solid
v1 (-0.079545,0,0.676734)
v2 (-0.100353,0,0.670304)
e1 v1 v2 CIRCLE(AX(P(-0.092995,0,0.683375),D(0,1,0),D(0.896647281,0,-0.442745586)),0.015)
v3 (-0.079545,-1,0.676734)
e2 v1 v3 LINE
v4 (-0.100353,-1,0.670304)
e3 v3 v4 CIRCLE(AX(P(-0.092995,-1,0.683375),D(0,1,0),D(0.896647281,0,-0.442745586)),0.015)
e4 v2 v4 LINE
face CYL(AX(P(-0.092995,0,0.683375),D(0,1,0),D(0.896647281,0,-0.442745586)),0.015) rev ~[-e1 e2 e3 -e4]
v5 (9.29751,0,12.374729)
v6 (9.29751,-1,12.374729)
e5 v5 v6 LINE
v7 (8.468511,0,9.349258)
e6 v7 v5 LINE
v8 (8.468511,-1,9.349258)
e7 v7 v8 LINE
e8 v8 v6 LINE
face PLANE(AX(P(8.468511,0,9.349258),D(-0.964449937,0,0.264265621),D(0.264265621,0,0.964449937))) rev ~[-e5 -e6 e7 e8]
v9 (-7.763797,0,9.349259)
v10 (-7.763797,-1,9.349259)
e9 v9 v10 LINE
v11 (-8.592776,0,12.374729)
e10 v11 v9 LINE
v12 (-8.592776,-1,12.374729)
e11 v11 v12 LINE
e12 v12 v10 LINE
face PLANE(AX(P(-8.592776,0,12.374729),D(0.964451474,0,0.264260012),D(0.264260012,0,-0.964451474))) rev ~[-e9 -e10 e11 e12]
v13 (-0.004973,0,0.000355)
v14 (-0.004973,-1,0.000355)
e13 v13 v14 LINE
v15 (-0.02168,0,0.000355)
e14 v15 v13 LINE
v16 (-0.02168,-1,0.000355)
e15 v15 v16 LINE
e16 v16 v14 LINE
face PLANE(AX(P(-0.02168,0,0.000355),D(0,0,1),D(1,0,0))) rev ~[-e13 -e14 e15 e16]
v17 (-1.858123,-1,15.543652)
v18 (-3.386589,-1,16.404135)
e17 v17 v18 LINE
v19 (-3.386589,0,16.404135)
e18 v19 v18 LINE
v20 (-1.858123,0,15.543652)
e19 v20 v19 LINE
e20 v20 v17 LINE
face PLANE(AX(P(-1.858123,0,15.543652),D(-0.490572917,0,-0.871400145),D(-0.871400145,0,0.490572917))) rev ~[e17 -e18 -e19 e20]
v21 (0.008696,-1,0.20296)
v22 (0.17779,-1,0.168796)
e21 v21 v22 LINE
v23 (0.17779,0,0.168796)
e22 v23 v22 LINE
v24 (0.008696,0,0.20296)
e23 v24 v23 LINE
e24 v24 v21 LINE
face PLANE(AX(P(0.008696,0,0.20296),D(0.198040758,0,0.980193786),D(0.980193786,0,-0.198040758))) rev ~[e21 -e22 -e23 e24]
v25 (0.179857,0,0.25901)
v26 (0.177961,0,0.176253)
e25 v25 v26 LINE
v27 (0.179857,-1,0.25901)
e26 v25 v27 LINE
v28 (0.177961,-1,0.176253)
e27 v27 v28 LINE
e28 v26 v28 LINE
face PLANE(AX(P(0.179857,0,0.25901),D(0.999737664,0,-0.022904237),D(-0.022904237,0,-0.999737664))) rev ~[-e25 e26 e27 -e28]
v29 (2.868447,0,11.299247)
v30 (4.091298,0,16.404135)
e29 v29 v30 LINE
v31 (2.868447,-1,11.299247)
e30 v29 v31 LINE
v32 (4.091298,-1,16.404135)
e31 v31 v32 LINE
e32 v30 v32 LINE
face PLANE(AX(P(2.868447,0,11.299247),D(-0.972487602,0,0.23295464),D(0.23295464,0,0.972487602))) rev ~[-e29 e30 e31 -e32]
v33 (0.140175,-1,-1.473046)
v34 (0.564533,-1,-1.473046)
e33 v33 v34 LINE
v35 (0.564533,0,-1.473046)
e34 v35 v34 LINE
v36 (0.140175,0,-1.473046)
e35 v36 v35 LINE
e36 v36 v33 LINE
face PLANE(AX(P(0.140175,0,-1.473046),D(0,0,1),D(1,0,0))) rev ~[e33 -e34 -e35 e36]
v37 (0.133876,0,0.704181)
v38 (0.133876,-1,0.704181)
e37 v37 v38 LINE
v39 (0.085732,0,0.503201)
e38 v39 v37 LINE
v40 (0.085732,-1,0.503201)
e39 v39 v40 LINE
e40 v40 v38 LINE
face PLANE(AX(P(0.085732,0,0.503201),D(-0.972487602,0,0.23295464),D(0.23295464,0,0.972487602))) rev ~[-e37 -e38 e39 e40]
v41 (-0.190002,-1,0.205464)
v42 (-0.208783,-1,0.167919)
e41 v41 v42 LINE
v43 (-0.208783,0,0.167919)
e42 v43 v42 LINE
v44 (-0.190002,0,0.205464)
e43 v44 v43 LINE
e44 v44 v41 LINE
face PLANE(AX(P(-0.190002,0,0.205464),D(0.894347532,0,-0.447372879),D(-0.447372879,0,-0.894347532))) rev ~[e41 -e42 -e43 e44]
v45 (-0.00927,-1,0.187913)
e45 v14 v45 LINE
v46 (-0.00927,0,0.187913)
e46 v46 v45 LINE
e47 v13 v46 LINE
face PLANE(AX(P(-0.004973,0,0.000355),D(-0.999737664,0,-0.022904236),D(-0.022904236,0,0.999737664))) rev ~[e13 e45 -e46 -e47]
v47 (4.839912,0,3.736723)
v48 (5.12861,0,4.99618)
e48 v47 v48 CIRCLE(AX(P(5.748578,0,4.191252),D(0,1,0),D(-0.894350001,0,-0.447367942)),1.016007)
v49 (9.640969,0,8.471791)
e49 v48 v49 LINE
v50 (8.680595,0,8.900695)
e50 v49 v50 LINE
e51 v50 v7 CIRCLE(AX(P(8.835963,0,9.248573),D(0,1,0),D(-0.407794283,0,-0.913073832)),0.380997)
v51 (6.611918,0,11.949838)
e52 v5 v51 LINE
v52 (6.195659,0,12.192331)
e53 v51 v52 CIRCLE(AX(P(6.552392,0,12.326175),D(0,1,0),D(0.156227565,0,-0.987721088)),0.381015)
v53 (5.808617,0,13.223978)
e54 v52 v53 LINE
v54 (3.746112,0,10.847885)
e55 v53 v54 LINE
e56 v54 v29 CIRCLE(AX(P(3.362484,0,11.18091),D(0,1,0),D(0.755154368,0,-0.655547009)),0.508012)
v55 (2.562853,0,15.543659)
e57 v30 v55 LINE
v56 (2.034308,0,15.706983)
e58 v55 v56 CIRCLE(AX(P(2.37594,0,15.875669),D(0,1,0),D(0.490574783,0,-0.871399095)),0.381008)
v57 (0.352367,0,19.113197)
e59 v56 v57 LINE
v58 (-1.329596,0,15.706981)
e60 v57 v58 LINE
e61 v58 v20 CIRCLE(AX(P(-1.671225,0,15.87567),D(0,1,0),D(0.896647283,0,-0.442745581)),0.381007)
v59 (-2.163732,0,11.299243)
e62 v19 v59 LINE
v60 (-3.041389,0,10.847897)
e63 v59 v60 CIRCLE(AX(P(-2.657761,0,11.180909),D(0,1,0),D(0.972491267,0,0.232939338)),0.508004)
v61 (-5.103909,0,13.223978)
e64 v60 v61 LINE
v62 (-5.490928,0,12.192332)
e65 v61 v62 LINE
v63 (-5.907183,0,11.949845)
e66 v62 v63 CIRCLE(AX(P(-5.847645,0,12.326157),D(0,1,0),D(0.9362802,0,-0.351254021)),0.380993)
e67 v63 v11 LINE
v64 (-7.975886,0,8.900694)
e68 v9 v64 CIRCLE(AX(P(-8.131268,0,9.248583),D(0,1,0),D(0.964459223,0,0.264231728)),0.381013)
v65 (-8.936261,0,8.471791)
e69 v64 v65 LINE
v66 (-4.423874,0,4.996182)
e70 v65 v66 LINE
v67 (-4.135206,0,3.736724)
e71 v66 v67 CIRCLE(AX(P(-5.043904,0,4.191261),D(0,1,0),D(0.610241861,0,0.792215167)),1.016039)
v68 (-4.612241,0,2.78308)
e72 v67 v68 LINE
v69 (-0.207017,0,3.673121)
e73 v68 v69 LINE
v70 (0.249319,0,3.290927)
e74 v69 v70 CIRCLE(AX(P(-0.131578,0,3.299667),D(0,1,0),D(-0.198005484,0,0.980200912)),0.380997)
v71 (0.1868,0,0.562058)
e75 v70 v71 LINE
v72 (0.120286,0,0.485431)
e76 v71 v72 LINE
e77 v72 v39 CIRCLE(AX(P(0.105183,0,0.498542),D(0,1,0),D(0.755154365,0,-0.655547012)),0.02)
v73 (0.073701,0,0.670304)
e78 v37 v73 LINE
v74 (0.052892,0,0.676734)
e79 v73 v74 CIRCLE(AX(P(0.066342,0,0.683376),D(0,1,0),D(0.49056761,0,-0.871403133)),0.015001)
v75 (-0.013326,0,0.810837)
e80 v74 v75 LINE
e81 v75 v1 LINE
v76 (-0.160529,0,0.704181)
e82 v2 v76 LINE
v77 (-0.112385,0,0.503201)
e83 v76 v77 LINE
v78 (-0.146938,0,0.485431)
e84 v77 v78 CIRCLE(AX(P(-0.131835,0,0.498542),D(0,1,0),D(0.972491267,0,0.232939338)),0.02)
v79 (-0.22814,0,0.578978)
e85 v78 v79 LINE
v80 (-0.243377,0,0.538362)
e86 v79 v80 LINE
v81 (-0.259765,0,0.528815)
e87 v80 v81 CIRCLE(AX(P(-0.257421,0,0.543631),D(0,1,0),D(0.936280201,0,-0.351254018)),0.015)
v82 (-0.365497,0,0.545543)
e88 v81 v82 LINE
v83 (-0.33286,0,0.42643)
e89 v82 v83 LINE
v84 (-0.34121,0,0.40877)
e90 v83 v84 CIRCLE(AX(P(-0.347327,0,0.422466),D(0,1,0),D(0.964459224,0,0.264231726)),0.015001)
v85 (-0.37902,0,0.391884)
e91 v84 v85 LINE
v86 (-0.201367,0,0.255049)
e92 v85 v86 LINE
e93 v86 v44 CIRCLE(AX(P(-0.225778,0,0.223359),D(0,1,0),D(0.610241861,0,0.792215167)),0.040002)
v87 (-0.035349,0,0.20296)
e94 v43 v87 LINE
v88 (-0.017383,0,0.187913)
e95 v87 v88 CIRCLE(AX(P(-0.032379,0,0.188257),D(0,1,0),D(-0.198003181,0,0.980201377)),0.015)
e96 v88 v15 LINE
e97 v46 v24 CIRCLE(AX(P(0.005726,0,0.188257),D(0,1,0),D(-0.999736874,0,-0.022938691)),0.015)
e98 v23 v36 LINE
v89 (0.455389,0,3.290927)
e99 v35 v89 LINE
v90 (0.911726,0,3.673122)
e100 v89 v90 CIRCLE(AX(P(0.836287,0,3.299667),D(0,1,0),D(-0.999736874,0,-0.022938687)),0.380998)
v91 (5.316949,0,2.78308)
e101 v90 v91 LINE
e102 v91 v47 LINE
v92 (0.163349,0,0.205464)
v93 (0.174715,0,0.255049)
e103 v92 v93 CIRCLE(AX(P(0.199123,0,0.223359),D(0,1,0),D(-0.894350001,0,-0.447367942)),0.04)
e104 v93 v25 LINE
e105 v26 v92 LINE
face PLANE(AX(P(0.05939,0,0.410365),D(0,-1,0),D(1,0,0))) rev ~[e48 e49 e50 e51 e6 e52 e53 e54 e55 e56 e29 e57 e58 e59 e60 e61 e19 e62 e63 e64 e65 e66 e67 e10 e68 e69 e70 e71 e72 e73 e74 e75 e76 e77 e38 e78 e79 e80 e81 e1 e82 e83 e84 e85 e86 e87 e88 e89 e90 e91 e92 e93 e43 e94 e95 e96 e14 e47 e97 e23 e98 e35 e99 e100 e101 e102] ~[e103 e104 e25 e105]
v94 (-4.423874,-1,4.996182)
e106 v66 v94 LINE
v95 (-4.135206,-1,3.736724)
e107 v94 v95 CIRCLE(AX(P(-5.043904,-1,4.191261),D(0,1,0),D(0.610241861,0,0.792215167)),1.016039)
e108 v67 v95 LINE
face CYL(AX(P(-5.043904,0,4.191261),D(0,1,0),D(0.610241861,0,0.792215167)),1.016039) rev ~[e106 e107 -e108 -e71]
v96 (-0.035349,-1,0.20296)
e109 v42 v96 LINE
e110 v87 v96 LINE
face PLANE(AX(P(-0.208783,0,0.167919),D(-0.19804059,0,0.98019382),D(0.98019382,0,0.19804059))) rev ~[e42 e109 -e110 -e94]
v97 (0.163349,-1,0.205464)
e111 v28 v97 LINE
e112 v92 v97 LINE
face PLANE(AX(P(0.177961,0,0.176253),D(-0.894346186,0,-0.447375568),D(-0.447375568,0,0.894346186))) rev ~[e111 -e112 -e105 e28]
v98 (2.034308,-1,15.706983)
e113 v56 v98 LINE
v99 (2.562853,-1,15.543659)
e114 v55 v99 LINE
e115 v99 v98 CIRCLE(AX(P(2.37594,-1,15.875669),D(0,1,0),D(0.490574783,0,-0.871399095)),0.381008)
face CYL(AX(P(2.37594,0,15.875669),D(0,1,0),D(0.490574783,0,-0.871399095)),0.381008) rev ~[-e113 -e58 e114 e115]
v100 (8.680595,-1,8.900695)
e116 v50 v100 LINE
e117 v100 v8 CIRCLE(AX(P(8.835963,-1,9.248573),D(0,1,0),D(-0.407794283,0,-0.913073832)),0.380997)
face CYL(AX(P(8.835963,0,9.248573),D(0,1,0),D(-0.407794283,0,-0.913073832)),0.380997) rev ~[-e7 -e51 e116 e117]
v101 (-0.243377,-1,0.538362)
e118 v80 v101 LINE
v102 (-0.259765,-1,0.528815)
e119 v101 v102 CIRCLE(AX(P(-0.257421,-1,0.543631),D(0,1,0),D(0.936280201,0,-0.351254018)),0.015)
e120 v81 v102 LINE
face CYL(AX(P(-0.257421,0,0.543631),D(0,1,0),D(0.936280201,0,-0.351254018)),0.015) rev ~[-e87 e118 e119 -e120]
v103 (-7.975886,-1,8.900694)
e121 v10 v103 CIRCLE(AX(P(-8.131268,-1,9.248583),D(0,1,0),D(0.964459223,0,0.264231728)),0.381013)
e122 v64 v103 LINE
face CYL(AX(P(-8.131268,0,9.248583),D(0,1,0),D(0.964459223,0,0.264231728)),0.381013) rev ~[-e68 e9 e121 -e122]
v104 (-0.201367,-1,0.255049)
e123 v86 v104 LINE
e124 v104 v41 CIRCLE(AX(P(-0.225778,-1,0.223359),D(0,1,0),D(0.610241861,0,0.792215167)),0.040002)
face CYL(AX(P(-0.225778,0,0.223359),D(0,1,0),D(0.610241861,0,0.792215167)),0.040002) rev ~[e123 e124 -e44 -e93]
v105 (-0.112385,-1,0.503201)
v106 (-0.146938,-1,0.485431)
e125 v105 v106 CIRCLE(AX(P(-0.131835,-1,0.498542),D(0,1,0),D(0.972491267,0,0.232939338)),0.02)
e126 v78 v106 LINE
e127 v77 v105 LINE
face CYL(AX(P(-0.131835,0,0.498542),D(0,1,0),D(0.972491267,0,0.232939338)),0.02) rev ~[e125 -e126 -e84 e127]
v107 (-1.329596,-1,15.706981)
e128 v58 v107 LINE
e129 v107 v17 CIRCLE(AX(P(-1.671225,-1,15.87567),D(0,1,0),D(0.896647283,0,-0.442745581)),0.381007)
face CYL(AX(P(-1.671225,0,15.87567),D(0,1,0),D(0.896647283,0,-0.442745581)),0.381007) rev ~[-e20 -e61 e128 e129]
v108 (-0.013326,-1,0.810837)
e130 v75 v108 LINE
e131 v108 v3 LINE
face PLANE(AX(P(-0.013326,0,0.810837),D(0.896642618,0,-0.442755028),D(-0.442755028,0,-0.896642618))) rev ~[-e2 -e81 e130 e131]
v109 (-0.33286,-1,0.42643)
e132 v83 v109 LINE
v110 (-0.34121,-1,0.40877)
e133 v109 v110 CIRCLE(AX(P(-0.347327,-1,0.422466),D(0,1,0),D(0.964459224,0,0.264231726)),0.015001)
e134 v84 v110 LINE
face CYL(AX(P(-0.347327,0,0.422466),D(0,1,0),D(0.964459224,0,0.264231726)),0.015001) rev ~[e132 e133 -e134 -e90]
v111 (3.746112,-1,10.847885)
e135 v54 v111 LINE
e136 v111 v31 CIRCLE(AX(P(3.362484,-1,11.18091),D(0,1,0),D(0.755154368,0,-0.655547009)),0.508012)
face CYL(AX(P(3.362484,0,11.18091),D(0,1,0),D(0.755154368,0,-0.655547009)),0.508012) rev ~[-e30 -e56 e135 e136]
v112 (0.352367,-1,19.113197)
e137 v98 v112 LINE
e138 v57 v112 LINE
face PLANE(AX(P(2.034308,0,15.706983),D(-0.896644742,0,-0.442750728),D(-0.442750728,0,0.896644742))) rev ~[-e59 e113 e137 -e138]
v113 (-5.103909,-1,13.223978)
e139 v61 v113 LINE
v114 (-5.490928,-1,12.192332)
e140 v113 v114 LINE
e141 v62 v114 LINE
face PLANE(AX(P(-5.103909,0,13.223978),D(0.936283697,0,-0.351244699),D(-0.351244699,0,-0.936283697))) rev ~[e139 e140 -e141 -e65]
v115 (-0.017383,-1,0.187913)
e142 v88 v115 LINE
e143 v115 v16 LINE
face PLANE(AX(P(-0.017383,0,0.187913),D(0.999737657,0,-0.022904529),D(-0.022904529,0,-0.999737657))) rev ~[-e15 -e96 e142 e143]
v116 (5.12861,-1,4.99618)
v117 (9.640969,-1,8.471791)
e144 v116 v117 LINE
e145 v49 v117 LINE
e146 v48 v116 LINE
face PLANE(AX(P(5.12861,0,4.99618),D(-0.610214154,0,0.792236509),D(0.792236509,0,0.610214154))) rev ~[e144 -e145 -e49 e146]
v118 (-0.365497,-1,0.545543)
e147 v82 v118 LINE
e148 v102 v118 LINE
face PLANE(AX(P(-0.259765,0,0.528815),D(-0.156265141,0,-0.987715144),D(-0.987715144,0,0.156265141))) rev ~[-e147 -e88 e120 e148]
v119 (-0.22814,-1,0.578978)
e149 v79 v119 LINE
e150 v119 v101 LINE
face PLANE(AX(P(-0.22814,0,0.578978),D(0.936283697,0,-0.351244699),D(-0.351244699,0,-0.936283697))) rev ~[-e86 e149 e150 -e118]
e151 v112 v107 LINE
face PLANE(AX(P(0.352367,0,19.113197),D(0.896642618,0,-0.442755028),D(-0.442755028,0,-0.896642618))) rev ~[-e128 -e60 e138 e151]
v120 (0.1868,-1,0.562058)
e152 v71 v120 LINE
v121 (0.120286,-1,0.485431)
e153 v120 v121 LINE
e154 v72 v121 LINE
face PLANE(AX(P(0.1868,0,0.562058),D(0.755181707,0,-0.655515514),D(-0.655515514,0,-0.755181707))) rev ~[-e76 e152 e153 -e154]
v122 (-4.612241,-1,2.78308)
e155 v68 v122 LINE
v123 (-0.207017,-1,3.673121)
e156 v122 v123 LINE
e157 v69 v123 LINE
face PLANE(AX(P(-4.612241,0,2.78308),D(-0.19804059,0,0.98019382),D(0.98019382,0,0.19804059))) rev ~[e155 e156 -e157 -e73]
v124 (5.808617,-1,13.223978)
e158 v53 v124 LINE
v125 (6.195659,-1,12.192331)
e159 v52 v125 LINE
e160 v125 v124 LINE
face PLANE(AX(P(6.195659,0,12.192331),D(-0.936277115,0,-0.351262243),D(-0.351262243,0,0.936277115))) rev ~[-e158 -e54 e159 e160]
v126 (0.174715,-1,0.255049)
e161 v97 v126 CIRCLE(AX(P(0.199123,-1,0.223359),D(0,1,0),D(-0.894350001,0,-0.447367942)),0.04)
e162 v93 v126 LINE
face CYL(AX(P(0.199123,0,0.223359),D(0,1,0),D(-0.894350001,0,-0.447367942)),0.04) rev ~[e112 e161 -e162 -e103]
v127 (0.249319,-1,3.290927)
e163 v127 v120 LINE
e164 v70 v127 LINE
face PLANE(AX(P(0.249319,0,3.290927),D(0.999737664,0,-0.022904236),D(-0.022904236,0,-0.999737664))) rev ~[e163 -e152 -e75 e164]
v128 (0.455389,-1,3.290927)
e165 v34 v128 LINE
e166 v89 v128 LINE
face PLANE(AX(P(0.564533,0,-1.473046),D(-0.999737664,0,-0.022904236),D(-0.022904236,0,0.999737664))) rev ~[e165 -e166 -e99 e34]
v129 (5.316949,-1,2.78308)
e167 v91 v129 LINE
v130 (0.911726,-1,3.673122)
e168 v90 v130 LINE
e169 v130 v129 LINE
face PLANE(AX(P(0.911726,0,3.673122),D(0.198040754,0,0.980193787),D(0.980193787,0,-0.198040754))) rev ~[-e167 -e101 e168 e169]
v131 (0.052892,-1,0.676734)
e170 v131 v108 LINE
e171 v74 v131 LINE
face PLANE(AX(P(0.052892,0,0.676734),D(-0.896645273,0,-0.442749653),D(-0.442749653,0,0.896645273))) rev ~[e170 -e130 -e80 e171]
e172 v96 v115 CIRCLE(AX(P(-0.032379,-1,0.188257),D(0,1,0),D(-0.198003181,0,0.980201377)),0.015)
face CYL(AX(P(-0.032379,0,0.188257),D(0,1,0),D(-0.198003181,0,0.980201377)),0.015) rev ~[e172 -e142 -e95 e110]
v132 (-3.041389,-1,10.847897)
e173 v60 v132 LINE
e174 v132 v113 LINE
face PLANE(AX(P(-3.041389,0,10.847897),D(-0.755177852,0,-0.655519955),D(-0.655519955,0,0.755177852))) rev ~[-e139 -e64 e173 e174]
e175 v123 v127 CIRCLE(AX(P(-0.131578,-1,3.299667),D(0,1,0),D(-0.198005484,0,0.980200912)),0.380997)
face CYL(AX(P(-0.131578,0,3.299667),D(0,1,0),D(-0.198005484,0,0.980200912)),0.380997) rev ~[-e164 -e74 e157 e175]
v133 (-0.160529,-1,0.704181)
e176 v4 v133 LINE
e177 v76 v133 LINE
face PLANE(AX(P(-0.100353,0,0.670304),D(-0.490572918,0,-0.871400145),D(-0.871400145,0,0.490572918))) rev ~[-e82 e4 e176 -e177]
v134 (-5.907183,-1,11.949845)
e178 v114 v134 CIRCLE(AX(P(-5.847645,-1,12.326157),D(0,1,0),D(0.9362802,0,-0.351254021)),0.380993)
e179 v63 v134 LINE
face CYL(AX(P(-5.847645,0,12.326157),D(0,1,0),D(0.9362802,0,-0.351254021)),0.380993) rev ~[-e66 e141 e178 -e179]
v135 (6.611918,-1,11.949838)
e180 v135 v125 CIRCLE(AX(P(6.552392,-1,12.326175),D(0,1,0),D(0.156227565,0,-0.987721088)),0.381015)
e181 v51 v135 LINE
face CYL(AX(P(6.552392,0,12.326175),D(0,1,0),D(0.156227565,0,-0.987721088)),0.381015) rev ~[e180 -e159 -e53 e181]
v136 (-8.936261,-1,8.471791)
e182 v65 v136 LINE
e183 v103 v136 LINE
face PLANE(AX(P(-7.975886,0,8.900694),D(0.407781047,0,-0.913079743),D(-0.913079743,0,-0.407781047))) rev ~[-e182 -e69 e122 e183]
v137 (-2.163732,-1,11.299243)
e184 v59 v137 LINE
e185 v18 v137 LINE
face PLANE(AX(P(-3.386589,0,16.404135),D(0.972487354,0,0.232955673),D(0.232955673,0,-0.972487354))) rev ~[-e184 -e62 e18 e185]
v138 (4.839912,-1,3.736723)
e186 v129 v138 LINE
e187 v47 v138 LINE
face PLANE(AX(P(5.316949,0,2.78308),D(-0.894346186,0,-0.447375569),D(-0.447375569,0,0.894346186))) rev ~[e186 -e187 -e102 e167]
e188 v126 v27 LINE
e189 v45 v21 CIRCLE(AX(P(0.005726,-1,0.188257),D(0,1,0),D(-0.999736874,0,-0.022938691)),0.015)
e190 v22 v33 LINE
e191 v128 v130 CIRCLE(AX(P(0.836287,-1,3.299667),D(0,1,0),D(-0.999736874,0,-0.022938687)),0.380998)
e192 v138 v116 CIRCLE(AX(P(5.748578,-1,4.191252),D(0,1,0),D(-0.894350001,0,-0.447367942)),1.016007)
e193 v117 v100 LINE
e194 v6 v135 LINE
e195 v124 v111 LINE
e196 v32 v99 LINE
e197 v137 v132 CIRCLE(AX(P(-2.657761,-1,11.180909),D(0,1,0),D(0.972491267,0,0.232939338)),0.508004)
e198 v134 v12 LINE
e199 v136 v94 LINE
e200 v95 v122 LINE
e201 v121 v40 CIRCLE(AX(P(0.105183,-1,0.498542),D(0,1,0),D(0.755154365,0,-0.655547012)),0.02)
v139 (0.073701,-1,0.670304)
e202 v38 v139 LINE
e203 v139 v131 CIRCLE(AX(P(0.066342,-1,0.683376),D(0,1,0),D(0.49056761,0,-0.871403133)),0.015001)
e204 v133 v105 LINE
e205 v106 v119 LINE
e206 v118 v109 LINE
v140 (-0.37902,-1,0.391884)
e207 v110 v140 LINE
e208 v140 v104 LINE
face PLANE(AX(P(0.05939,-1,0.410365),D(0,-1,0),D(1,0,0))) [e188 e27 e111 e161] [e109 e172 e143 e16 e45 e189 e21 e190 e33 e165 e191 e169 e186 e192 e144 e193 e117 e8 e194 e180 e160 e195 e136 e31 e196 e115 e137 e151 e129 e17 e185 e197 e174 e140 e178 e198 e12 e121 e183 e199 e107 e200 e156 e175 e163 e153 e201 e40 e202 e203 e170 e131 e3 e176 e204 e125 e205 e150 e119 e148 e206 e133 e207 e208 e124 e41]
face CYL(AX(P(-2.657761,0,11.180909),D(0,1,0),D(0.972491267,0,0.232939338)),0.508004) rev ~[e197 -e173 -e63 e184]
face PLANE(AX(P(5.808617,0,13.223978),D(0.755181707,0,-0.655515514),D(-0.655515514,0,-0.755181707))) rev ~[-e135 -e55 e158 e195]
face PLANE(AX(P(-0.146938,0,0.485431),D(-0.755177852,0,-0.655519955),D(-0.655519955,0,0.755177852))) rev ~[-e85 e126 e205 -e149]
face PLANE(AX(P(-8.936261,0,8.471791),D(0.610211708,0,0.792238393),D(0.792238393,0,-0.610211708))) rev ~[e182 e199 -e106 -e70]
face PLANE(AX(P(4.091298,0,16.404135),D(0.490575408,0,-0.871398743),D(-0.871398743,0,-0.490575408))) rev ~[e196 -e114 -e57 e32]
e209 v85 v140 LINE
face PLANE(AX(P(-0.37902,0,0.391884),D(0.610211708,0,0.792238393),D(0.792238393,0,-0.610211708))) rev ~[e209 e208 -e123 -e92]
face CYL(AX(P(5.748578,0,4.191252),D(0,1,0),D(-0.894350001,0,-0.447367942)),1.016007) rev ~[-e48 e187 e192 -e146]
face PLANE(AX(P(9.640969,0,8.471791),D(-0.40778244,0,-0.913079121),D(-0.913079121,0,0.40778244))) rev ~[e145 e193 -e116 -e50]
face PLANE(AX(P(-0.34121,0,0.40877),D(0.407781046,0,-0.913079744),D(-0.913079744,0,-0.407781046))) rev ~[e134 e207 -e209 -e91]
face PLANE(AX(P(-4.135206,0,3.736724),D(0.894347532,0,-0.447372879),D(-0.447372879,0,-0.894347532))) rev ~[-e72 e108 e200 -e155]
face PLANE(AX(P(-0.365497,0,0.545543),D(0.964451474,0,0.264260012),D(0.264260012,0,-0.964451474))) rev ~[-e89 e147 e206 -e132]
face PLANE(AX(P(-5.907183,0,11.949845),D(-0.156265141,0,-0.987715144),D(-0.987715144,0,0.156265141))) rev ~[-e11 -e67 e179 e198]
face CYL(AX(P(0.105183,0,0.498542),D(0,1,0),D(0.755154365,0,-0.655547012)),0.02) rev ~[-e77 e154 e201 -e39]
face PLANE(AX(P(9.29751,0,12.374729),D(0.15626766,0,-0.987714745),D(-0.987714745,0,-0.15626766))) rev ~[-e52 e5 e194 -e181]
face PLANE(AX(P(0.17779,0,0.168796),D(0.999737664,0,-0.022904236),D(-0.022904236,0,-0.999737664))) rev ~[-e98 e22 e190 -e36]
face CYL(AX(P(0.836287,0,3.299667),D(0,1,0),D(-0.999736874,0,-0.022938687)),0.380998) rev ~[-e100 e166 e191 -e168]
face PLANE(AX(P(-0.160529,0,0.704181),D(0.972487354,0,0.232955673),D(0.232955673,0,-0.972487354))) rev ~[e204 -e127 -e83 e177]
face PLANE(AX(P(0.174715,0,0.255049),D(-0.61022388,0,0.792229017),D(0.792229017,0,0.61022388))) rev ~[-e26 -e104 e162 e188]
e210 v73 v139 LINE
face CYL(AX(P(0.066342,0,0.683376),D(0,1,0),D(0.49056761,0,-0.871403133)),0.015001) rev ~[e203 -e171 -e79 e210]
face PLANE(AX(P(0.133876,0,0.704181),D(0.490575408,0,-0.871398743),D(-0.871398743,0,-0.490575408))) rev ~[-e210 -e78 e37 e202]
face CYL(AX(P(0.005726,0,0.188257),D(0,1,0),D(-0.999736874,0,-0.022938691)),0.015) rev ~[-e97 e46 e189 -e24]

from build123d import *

# Parameters (mm, degrees)
F1_DEPTH = 1


# Not quite as in the source:
# - ends of sketch curves that miss each other by under 0.0002 mm in the source are joined


with BuildPart() as f1:
    # F0 (on Front) → F1 (new body)
    with BuildSketch(Plane.XZ):
        with BuildLine():
            Line((0.0528919554, 0.676734003), (-0.0133260446, 0.810837003))
            Line((-0.0133260446, 0.810837003), (-0.0133260446, 0.000355003))
            Line((-0.0133260446, 0.000355003), (-0.0049730446, 0.000355003))
            Line((-0.0049730446, 0.000355003), (-0.0092700446, 0.187913003))
            ThreePointArc((-0.0092700446, 0.187913003), (-0.0039052307, 0.1997565793), (0.0086959613, 0.2029600321))
            Line((0.0086959613, 0.2029600321), (0.1777903392, 0.168795789))
            Line((0.1777903392, 0.168795789), (0.1779611806, 0.1762527791))
            Line((0.1779611806, 0.1762527791), (0.1633489554, 0.205464003))
            ThreePointArc((0.1633489554, 0.205464003), (0.1601341311, 0.2322960931), (0.1747150055, 0.255048938))
            Line((0.1747150055, 0.255048938), (0.1798571632, 0.2590097465))
            Line((0.1798571632, 0.2590097465), (0.1868000755, 0.5620580937))
            Line((0.1868000755, 0.5620580937), (0.1202859554, 0.485431003))
            ThreePointArc((0.1202859554, 0.485431003), (0.0960352028, 0.4807561402), (0.0857322231, 0.5032011784))
            Line((0.0857322231, 0.5032011784), (0.1338759554, 0.704181003))
            Line((0.1338759554, 0.704181003), (0.0737009554, 0.670304003))
            ThreePointArc((0.0737009554, 0.670304003), (0.0619135468, 0.669043597), (0.0528919554, 0.676734003))
        make_face()
        with BuildLine():
            Line((-0.0133260446, 0.000355003), (-0.0133260446, 0.810837003))
            Line((-0.0133260446, 0.810837003), (-0.0795450446, 0.676734003))
            ThreePointArc((-0.0795450446, 0.676734003), (-0.0885662197, 0.6690437257), (-0.1003531884, 0.6703037475))
            Line((-0.1003531884, 0.6703037475), (-0.1605290446, 0.704181003))
            Line((-0.1605290446, 0.704181003), (-0.1123850446, 0.503201003))
            ThreePointArc((-0.1123850446, 0.503201003), (-0.1226883956, 0.4807560869), (-0.1469384945, 0.4854314805))
            Line((-0.1469384945, 0.4854314805), (-0.2281400446, 0.578978003))
            Line((-0.2281400446, 0.578978003), (-0.2433770446, 0.538362003))
            ThreePointArc((-0.2433770446, 0.538362003), (-0.2498706649, 0.5306698392), (-0.2597650019, 0.5288152727))
            Line((-0.2597650019, 0.5288152727), (-0.3654970446, 0.545543003))
            Line((-0.3654970446, 0.545543003), (-0.3328600446, 0.426430003))
            ThreePointArc((-0.3328600446, 0.426430003), (-0.3337663691, 0.4160544447), (-0.3412100188, 0.4087699453))
            Line((-0.3412100188, 0.4087699453), (-0.3790200446, 0.391884003))
            Line((-0.3790200446, 0.391884003), (-0.2013670446, 0.255049003))
            ThreePointArc((-0.2013670446, 0.255049003), (-0.1867871318, 0.232295707), (-0.1900021575, 0.2054640595))
            Line((-0.1900021575, 0.2054640595), (-0.2087830446, 0.167919003))
            Line((-0.2087830446, 0.167919003), (-0.0353490446, 0.202960003))
            ThreePointArc((-0.0353490446, 0.202960003), (-0.0227478586, 0.1997565793), (-0.0173829897, 0.1879130018))
            Line((-0.0173829897, 0.1879130018), (-0.0216800446, 0.000355003))
            Line((-0.0216800446, 0.000355003), (-0.0133260446, 0.000355003))
        make_face()
        Polygon((0.1779611806, 0.1762527791), (0.1777903392, 0.168795789), (0.1821299554, 0.167919003), align=None)
        Polygon((0.1821299554, 0.167919003), (0.1777903392, 0.168795789), (0.1401753438, -1.4730457961), (0.3523669438, -1.4730457961), (0.3523669438, 0.391884003), (0.1798571632, 0.2590097465), (0.1779611806, 0.1762527791), align=None)
        with BuildLine():
            Line((0.2493191438, 3.2909274039), (0.1868000755, 0.5620580937))
            Line((0.1868000755, 0.5620580937), (0.2014869554, 0.578978003))
            Line((0.2014869554, 0.578978003), (0.2167249554, 0.538362003))
            ThreePointArc((0.2167249554, 0.538362003), (0.2232185757, 0.5306698392), (0.2331129127, 0.5288152727))
            Line((0.2331129127, 0.5288152727), (0.3388449554, 0.545543003))
            Line((0.3388449554, 0.545543003), (0.3062069554, 0.426430003))
            ThreePointArc((0.3062069554, 0.426430003), (0.3071132799, 0.4160544447), (0.3145569296, 0.4087699453))
            Line((0.3145569296, 0.4087699453), (0.3523669554, 0.391884003))
            Line((0.3523669554, 0.391884003), (0.3523669438, 19.1131970039))
            Line((0.3523669438, 19.1131970039), (-1.3295956562, 15.7069808039))
            ThreePointArc((-1.3295956562, 15.7069808039), (-1.5587335044, 15.5116477594), (-1.858122509, 15.5436523149))
            Line((-1.858122509, 15.5436523149), (-3.3865892562, 16.4041346039))
            Line((-3.3865892562, 16.4041346039), (-2.1637316562, 11.2992426039))
            ThreePointArc((-2.1637316562, 11.2992426039), (-2.4254367706, 10.7291417351), (-3.0413892842, 10.8478967322))
            Line((-3.0413892842, 10.8478967322), (-5.1039086562, 13.2239784039))
            Line((-5.1039086562, 13.2239784039), (-5.4909284562, 12.1923320039))
            ThreePointArc((-5.4909284562, 12.1923320039), (-5.6558664119, 11.996951044), (-5.9071825723, 11.9498450545))
            Line((-5.9071825723, 11.9498450545), (-8.5927764562, 12.3747294039))
            Line((-8.5927764562, 12.3747294039), (-7.7637966562, 9.3492592039))
            ThreePointArc((-7.7637966562, 9.3492592039), (-7.786817298, 9.0857200238), (-7.9758860019, 8.9006937389))
            Line((-7.9758860019, 8.9006937389), (-8.9362606562, 8.4717908039))
            Line((-8.9362606562, 8.4717908039), (-4.4238744562, 4.9961818039))
            ThreePointArc((-4.4238744562, 4.9961818039), (-4.0535446709, 4.4182480852), (-4.1352063244, 3.7367242387))
            Line((-4.1352063244, 3.7367242387), (-4.6122408562, 2.7830798039))
            Line((-4.6122408562, 2.7830798039), (-0.2070172562, 3.6731212039))
            ThreePointArc((-0.2070172562, 3.6731212039), (0.1130528694, 3.5917542423), (0.2493191438, 3.2909274039))
        make_face()
        with BuildLine():
            Line((0.2014869554, 0.578978003), (0.1868000755, 0.5620580937))
            Line((0.1868000755, 0.5620580937), (0.1798571632, 0.2590097465))
            Line((0.1798571632, 0.2590097465), (0.3523669554, 0.391884003))
            Line((0.3523669554, 0.391884003), (0.3145569554, 0.408770003))
            ThreePointArc((0.3145569554, 0.408770003), (0.3071132799, 0.4160544447), (0.3062071928, 0.426429938))
            Line((0.3062071928, 0.426429938), (0.3388449554, 0.545543003))
            Line((0.3388449554, 0.545543003), (0.2331129554, 0.528815003))
            ThreePointArc((0.2331129554, 0.528815003), (0.2232185757, 0.5306698392), (0.2167248398, 0.5383619597))
            Line((0.2167248398, 0.5383619597), (0.2014869554, 0.578978003))
        make_face()
        with BuildLine():
            Line((0.3523669438, 0.391884003), (0.3523669438, -1.4730457961))
            Line((0.3523669438, -1.4730457961), (0.5645331438, -1.4730457961))
            Line((0.5645331438, -1.4730457961), (0.4553893438, 3.2909274039))
            ThreePointArc((0.4553893438, 3.2909274039), (0.5916556183, 3.5917542423), (0.9117258932, 3.6731219434))
            Line((0.9117258932, 3.6731219434), (5.3169493438, 2.7830798039))
            Line((5.3169493438, 2.7830798039), (4.8399119438, 3.7367228039))
            ThreePointArc((4.8399119438, 3.7367228039), (4.7582554065, 4.4182578922), (5.1286096155, 4.9961801528))
            Line((5.1286096155, 4.9961801528), (9.6409691438, 8.4717908039))
            Line((9.6409691438, 8.4717908039), (8.6805951438, 8.9006952039))
            ThreePointArc((8.6805951438, 8.9006952039), (8.4915257857, 9.0857200238), (8.4685111742, 9.3492575516))
            Line((8.4685111742, 9.3492575516), (9.2975103438, 12.3747294039))
            Line((9.2975103438, 12.3747294039), (6.6119175438, 11.9498382039))
            ThreePointArc((6.6119175438, 11.9498382039), (6.3606002996, 11.996951044), (6.1956594084, 12.1923309026))
            Line((6.1956594084, 12.1923309026), (5.8086171438, 13.2239784039))
            Line((5.8086171438, 13.2239784039), (3.7461117438, 10.8478846039))
            ThreePointArc((3.7461117438, 10.8478846039), (3.1301426273, 10.7291430881), (2.8684469448, 11.2992470593))
            Line((2.8684469448, 11.2992470593), (4.0912977438, 16.4041346039))
            Line((4.0912977438, 16.4041346039), (2.5628527438, 15.5436588039))
            ThreePointArc((2.5628527438, 15.5436588039), (2.2634525656, 15.511644492), (2.0343082289, 15.7069828209))
            Line((2.0343082289, 15.7069828209), (0.3523669438, 19.1131970039))
            Line((0.3523669438, 19.1131970039), (0.3523669438, 0.391884003))
        make_face()
    extrude(amount=F1_DEPTH)


solid = f1.part
